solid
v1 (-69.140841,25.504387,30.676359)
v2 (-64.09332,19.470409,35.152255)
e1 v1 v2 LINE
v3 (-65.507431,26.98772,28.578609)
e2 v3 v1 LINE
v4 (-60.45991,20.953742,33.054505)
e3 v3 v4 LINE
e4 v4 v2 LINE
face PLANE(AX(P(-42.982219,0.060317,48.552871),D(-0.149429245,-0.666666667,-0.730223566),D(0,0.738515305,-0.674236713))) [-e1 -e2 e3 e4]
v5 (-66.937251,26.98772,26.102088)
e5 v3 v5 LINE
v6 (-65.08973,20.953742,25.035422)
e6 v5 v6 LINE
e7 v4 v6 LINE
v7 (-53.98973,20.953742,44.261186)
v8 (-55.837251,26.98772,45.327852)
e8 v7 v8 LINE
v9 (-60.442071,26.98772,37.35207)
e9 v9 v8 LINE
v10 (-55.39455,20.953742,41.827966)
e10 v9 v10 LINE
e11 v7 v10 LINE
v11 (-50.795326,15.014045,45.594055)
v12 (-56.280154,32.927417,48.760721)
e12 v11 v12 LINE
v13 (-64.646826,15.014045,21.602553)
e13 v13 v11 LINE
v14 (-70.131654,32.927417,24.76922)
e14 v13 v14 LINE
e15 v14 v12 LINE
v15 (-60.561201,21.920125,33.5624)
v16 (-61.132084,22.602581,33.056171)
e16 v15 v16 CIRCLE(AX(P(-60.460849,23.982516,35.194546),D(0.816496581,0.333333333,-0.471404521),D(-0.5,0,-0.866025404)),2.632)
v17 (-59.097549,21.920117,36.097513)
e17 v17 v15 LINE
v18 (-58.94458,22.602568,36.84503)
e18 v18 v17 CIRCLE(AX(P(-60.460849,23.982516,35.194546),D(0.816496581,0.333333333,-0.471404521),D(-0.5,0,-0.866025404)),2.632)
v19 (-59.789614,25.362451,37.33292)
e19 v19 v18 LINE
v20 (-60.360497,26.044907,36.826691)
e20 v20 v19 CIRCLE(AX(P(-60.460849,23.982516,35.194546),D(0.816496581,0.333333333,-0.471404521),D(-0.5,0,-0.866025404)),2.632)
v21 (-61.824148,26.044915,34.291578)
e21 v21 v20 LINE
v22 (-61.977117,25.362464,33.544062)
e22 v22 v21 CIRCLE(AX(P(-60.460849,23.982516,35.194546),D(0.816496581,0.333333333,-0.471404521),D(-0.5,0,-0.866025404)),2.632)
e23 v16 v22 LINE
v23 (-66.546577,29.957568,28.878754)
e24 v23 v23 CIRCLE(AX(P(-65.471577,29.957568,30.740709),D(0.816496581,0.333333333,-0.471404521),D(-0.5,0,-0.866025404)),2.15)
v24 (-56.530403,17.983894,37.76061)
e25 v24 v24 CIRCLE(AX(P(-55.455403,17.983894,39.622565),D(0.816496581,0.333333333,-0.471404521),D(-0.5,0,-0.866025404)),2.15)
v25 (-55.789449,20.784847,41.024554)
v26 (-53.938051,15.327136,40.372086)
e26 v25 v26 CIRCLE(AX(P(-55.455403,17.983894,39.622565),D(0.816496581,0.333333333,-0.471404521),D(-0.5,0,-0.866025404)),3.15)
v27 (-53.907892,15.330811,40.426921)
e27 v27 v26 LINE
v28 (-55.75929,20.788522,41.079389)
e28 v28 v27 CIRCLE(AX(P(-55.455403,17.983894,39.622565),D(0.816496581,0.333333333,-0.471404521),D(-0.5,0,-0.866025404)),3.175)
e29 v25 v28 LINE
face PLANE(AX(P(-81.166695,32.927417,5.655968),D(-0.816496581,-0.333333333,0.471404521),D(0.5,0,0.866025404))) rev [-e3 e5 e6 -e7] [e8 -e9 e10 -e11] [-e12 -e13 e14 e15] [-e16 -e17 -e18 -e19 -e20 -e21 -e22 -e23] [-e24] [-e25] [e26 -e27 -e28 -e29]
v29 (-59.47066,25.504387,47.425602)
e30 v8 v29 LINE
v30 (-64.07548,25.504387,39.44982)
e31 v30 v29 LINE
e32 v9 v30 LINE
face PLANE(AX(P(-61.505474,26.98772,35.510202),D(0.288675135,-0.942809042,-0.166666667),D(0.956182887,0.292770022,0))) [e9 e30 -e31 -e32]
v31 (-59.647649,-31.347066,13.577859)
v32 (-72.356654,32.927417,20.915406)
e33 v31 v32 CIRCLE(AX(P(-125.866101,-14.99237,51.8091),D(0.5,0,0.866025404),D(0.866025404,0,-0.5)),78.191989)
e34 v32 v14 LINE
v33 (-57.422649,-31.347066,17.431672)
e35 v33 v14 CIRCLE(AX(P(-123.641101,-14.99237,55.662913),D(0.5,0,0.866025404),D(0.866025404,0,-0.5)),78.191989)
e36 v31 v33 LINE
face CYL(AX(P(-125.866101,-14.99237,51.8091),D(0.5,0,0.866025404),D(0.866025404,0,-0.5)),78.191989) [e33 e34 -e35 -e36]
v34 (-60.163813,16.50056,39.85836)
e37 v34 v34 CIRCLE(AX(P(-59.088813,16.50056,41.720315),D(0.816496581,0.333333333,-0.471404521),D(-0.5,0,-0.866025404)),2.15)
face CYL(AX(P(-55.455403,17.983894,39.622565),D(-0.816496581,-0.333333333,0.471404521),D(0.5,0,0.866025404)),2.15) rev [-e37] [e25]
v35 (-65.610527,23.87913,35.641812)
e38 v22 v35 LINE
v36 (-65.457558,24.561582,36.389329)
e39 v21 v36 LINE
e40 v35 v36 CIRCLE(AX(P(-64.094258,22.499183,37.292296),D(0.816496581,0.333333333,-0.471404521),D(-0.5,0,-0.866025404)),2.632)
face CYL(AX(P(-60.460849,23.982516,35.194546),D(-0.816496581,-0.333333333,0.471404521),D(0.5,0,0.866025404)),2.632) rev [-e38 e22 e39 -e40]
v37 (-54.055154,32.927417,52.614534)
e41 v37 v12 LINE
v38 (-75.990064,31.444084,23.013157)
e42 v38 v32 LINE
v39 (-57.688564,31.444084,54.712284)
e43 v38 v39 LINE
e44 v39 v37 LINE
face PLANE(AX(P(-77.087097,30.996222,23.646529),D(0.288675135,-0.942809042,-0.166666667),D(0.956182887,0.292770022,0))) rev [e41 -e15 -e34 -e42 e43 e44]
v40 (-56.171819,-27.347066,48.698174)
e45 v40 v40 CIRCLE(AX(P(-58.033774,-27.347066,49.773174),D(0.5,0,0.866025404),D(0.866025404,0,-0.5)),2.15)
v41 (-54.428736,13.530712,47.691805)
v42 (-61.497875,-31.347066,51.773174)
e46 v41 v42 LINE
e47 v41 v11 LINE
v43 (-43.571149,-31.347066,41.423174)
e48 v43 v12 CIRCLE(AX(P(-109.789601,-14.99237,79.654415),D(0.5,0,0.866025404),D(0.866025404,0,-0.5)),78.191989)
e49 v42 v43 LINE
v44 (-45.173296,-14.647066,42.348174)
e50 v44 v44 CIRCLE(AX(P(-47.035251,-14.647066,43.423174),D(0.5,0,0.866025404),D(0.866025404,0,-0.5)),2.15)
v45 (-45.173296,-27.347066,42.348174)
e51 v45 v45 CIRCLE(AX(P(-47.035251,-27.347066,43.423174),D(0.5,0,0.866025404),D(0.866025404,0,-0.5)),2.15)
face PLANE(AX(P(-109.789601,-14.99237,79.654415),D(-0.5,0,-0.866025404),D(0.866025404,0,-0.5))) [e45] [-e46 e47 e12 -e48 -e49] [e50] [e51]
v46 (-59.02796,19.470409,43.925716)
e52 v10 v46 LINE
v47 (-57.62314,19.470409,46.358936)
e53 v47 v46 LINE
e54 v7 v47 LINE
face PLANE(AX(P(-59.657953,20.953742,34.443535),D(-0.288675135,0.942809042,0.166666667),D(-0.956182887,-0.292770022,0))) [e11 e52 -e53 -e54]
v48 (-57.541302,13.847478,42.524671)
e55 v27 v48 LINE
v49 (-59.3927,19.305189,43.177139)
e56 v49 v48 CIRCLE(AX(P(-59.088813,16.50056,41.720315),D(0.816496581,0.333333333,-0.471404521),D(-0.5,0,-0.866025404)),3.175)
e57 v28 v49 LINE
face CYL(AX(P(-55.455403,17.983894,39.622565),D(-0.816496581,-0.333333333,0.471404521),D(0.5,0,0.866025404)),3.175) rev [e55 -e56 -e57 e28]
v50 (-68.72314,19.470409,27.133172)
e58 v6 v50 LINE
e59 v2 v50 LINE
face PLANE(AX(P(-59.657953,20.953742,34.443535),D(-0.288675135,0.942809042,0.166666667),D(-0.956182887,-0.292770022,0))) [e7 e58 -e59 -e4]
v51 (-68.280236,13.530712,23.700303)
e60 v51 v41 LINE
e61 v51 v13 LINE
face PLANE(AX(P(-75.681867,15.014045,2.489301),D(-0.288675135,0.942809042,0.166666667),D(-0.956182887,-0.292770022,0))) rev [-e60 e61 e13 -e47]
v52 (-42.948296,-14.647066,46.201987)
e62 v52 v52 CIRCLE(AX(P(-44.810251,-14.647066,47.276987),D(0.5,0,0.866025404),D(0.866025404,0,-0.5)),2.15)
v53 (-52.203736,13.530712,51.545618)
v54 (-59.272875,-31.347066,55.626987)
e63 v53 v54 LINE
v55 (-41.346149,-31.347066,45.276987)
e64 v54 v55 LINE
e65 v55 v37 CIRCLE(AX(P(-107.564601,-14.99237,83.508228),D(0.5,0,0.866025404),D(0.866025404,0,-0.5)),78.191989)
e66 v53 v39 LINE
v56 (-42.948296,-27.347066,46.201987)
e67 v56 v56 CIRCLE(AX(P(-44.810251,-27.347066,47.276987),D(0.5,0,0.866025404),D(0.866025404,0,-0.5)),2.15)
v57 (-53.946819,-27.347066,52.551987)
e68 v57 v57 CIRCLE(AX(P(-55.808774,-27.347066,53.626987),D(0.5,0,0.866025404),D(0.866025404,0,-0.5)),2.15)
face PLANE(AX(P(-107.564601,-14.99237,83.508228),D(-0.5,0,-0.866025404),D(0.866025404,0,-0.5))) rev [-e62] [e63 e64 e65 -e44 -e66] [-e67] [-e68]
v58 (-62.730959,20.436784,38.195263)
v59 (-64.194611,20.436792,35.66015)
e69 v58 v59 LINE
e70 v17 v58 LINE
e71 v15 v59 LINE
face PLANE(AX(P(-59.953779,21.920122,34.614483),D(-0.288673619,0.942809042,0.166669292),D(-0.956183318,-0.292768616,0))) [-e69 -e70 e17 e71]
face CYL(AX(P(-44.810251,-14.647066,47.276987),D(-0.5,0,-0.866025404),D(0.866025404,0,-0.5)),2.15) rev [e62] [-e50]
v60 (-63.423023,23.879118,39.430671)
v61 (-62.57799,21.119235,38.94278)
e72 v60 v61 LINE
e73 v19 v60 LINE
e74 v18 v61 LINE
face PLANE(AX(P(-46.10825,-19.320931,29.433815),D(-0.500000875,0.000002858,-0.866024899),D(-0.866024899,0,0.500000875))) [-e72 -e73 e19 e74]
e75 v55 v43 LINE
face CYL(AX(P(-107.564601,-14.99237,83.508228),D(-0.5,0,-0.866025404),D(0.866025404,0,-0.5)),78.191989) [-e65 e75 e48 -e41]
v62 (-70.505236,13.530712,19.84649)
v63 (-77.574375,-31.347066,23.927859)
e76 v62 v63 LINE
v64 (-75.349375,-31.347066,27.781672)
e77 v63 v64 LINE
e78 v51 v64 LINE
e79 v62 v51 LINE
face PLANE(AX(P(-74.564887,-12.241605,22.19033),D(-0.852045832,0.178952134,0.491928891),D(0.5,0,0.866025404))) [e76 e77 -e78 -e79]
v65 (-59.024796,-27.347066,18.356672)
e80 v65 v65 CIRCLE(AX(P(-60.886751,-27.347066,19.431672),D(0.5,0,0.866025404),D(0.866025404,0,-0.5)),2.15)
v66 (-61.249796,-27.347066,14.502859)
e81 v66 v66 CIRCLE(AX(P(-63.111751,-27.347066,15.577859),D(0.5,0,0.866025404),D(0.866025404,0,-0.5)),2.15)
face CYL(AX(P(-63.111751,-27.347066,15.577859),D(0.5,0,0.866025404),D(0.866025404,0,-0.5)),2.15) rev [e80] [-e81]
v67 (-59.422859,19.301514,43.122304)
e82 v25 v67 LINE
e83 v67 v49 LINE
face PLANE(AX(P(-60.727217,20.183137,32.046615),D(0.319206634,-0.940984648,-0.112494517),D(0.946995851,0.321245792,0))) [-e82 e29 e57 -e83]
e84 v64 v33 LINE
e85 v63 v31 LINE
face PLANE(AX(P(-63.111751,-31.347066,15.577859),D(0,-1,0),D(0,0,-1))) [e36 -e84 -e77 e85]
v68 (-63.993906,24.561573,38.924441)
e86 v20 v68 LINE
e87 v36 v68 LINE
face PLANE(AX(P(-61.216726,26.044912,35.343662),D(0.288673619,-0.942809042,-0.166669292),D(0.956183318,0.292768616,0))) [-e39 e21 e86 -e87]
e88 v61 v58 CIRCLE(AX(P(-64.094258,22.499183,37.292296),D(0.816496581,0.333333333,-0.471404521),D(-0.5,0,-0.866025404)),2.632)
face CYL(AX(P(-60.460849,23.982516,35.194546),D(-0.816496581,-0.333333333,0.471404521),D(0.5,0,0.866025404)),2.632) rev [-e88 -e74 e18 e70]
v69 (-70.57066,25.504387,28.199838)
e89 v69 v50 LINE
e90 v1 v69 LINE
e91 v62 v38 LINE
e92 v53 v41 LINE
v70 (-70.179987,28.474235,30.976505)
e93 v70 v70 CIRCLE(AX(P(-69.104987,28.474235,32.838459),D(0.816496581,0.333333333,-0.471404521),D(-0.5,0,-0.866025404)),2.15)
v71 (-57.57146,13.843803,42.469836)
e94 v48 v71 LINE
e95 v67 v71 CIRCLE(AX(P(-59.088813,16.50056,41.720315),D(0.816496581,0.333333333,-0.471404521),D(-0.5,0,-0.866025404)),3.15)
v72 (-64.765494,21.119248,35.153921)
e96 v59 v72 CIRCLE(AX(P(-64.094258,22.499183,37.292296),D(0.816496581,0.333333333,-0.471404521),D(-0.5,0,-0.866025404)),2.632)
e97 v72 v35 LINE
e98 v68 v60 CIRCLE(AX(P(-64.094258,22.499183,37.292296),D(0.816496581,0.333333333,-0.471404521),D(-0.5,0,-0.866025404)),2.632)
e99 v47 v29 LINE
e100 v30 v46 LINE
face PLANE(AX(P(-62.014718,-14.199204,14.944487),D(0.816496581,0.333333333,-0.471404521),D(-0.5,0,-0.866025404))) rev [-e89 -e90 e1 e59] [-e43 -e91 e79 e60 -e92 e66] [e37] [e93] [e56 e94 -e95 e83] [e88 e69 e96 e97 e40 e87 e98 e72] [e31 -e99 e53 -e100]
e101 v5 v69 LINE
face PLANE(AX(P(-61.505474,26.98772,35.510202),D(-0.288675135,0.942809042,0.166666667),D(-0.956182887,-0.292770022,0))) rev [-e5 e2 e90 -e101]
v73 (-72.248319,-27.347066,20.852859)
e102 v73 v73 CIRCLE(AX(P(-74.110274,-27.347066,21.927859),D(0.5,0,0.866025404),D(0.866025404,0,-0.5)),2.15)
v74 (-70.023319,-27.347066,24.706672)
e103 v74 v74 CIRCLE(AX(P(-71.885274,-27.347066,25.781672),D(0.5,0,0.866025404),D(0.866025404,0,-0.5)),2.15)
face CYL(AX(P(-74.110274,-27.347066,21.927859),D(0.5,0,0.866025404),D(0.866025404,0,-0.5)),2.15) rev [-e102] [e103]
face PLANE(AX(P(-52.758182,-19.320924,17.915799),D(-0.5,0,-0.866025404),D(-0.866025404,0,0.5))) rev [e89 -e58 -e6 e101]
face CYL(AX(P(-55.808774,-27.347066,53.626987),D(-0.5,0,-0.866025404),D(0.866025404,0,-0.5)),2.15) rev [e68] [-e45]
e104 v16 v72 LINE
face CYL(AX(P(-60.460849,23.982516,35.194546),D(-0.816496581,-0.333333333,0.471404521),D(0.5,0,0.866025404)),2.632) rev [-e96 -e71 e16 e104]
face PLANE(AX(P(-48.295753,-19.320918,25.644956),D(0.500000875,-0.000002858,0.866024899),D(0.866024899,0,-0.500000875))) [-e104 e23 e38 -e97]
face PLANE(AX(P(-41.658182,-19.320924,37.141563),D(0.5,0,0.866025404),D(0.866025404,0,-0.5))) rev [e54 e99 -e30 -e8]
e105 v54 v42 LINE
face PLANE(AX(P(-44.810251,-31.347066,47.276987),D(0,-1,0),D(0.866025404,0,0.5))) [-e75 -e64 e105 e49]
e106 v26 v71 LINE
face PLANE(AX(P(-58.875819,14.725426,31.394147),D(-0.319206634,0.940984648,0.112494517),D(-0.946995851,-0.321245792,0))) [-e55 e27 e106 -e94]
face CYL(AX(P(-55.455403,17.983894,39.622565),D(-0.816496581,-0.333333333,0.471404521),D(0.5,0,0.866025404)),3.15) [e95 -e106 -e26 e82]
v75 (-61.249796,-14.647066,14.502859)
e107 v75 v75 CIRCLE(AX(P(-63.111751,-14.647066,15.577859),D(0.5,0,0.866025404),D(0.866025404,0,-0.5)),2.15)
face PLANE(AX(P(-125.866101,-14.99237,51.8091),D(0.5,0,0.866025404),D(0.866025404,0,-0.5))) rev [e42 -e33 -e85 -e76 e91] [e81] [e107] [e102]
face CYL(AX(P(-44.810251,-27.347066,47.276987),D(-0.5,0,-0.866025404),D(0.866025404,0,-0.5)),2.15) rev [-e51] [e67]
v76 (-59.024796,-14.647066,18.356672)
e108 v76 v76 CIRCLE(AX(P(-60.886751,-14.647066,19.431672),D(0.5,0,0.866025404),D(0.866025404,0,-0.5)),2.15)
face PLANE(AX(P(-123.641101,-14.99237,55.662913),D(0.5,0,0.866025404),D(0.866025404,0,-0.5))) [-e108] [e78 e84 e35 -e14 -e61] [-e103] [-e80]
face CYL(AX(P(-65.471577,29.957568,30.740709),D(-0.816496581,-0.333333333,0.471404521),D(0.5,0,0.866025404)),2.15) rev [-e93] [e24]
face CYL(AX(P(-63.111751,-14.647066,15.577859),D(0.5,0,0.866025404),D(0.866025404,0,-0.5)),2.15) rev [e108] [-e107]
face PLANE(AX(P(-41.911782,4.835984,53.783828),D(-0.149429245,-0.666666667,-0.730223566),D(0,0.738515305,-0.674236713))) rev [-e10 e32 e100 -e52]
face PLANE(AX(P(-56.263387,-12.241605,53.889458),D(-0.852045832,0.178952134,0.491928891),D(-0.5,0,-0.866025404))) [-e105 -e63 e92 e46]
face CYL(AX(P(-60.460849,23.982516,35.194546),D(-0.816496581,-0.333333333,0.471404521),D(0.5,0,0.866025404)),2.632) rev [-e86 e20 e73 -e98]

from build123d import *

# Parameters (mm, degrees)
BOSS_EXTRUDE1_OUTLINE_R = 2.15
BOSS_EXTRUDE1_DEPTH     = 4.45
BOSS_EXTRUDE2_START     = 1.2515
SKETCH2_R               = 2.15
BOSS_EXTRUDE2_DEPTH     = 4.45
BOSS_EXTRUDE3_DEPTH     = 1.251499962


# Read off the part's stored shape, not the designer's step: Boss-Extrude1
with BuildPart() as part:
    # Boss-Extrude1 outline → Boss-Extrude1 (new body)
    with BuildSketch(Plane(origin=(-50.959815044, -20.804257374, 29.421662933), x_dir=(-0.4364357804719844, -0.17817416127494956, -0.8819171036881971), z_dir=(0.8164965809277264, 0.3333333333333333, -0.4714045207910314))):
        Polygon((-19.487444888, 33.335644756), (5.258463865, 38.097997116), (1.667801371, 56.755626731), (-23.078107381, 51.993274371), align=None)
        with BuildLine():
            ThreePointArc((-14.857414364, 34.568841104), (-17.094425047, 37.205029513), (-15.59724376, 40.32146246))
            Line((-15.59724376, 40.32146246), (-15.535066644, 40.329458894))
            ThreePointArc((-15.535066644, 40.329458894), (-17.069629265, 37.208218432), (-14.795237248, 34.576837538))
            Line((-14.795237248, 34.576837538), (-14.857414364, 34.568841104))
        make_face(mode=Mode.SUBTRACT)
        with Locations((-13.94536077, 37.610022328)):
            Circle(BOSS_EXTRUDE1_OUTLINE_R, mode=Mode.SUBTRACT)
        Polygon((-11.370861729, 47.830728875), (-16.446050654, 40.336567322), (-19.205062219, 39.805595299), (-20.414548532, 46.090270538), align=None, mode=Mode.SUBTRACT)
        with BuildLine():
            Line((-10.795931949, 43.204869293), (-11.349147903, 46.079416754))
            ThreePointArc((-11.349147903, 46.079416754), (-11.103747968, 46.531394654), (-10.775137708, 46.927021304))
            Line((-10.775137708, 46.927021304), (-7.900590246, 47.480237259))
            ThreePointArc((-7.900590246, 47.480237259), (-7.448612347, 47.234837323), (-7.052985696, 46.906227063))
            Line((-7.052985696, 46.906227063), (-6.499769742, 44.031679602))
            ThreePointArc((-6.499769742, 44.031679602), (-6.745169677, 43.579701702), (-7.073779937, 43.184075051))
            Line((-7.073779937, 43.184075051), (-9.948327399, 42.630859097))
            ThreePointArc((-9.948327399, 42.630859097), (-10.400305299, 42.876259032), (-10.795931949, 43.204869293))
        make_face(mode=Mode.SUBTRACT)
        Polygon((-1.422691887, 49.745255053), (1.385418702, 50.285676188), (2.594905016, 44.00100095), (-6.497880812, 42.251093501), align=None, mode=Mode.SUBTRACT)
        with Locations((-3.874282746, 52.481249159)):
            Circle(BOSS_EXTRUDE1_OUTLINE_R, mode=Mode.SUBTRACT)
    extrude(amount=BOSS_EXTRUDE1_DEPTH)


with BuildPart() as body_2:
    # Sketch2 → Boss-Extrude2 (new body)
    with BuildSketch(Plane(origin=(-6.181776854, 0, -10.707151593), x_dir=(-0.866025403784439, 0, 0.4999999999999995), z_dir=(-0.49999999999999944, 0, -0.8660254037844389)).offset(BOSS_EXTRUDE2_START)):
        with BuildLine():
            Line((70.982570609, 13.530711728), (79.145309345, -31.347065587))
            Line((79.145309345, -31.347065587), (58.445309345, -31.347065587))
            ThreePointArc((58.445309345, -31.347065587), (58.677489694, 2.412466855), (73.120403707, 32.927416852))
            Line((73.120403707, 32.927416852), (77.315903942, 31.444083519))
            Line((77.315903942, 31.444083519), (70.982570609, 13.530711728))
        make_face()
        with Locations(Location((62.445309345, -27.347065587, 0), (0, 0, 180))):
            Circle(SKETCH2_R, mode=Mode.SUBTRACT)
        with Locations(Location((62.445309345, -14.647065587, 0), (0, 0, 180))):
            Circle(SKETCH2_R, mode=Mode.SUBTRACT)
        with Locations(Location((75.145309345, -27.347065587, 0), (0, 0, 180))):
            Circle(SKETCH2_R, mode=Mode.SUBTRACT)
    extrude(amount=BOSS_EXTRUDE2_DEPTH)


with BuildPart() as body_3:
    # Sketch4 → Boss-Extrude3 (new body)
    with BuildSketch(Plane(origin=(-6.181776854, 0, -10.707151593), x_dir=(-0.866025403784439, 0, 0.4999999999999995), z_dir=(-0.49999999999999944, 0, -0.8660254037844389))):
        Polygon((70.982570609, 13.530711728), (77.315903942, 31.444083519), (73.120403707, 32.927416852), (66.787070374, 15.014045062), align=None)
    extrude(amount=BOSS_EXTRUDE3_DEPTH)


with BuildPart() as body_4:
    # Mirror1: mirrored copy
    add(body_2.part.mirror(Plane(origin=(0.118223146, 0, 0.204768495), x_dir=(-0.8660254037844389, 0, 0.49999999999999967), z_dir=(0.49999999999999944, 0, 0.8660254037844389))))


with BuildPart() as body_5:
    # Mirror1 2: mirrored copy
    add(body_3.part.mirror(Plane(origin=(0.118223146, 0, 0.204768495), x_dir=(-0.8660254037844389, 0, 0.49999999999999967), z_dir=(0.49999999999999944, 0, 0.8660254037844389))))


with BuildPart() as body_2_1:
    add(body_2.part)

    # Combine1: union body 3, body 4, body 5, part
    add(body_3.part)
    add(body_4.part)
    add(body_5.part)
    add(part.part)


solid = body_2_1.part
